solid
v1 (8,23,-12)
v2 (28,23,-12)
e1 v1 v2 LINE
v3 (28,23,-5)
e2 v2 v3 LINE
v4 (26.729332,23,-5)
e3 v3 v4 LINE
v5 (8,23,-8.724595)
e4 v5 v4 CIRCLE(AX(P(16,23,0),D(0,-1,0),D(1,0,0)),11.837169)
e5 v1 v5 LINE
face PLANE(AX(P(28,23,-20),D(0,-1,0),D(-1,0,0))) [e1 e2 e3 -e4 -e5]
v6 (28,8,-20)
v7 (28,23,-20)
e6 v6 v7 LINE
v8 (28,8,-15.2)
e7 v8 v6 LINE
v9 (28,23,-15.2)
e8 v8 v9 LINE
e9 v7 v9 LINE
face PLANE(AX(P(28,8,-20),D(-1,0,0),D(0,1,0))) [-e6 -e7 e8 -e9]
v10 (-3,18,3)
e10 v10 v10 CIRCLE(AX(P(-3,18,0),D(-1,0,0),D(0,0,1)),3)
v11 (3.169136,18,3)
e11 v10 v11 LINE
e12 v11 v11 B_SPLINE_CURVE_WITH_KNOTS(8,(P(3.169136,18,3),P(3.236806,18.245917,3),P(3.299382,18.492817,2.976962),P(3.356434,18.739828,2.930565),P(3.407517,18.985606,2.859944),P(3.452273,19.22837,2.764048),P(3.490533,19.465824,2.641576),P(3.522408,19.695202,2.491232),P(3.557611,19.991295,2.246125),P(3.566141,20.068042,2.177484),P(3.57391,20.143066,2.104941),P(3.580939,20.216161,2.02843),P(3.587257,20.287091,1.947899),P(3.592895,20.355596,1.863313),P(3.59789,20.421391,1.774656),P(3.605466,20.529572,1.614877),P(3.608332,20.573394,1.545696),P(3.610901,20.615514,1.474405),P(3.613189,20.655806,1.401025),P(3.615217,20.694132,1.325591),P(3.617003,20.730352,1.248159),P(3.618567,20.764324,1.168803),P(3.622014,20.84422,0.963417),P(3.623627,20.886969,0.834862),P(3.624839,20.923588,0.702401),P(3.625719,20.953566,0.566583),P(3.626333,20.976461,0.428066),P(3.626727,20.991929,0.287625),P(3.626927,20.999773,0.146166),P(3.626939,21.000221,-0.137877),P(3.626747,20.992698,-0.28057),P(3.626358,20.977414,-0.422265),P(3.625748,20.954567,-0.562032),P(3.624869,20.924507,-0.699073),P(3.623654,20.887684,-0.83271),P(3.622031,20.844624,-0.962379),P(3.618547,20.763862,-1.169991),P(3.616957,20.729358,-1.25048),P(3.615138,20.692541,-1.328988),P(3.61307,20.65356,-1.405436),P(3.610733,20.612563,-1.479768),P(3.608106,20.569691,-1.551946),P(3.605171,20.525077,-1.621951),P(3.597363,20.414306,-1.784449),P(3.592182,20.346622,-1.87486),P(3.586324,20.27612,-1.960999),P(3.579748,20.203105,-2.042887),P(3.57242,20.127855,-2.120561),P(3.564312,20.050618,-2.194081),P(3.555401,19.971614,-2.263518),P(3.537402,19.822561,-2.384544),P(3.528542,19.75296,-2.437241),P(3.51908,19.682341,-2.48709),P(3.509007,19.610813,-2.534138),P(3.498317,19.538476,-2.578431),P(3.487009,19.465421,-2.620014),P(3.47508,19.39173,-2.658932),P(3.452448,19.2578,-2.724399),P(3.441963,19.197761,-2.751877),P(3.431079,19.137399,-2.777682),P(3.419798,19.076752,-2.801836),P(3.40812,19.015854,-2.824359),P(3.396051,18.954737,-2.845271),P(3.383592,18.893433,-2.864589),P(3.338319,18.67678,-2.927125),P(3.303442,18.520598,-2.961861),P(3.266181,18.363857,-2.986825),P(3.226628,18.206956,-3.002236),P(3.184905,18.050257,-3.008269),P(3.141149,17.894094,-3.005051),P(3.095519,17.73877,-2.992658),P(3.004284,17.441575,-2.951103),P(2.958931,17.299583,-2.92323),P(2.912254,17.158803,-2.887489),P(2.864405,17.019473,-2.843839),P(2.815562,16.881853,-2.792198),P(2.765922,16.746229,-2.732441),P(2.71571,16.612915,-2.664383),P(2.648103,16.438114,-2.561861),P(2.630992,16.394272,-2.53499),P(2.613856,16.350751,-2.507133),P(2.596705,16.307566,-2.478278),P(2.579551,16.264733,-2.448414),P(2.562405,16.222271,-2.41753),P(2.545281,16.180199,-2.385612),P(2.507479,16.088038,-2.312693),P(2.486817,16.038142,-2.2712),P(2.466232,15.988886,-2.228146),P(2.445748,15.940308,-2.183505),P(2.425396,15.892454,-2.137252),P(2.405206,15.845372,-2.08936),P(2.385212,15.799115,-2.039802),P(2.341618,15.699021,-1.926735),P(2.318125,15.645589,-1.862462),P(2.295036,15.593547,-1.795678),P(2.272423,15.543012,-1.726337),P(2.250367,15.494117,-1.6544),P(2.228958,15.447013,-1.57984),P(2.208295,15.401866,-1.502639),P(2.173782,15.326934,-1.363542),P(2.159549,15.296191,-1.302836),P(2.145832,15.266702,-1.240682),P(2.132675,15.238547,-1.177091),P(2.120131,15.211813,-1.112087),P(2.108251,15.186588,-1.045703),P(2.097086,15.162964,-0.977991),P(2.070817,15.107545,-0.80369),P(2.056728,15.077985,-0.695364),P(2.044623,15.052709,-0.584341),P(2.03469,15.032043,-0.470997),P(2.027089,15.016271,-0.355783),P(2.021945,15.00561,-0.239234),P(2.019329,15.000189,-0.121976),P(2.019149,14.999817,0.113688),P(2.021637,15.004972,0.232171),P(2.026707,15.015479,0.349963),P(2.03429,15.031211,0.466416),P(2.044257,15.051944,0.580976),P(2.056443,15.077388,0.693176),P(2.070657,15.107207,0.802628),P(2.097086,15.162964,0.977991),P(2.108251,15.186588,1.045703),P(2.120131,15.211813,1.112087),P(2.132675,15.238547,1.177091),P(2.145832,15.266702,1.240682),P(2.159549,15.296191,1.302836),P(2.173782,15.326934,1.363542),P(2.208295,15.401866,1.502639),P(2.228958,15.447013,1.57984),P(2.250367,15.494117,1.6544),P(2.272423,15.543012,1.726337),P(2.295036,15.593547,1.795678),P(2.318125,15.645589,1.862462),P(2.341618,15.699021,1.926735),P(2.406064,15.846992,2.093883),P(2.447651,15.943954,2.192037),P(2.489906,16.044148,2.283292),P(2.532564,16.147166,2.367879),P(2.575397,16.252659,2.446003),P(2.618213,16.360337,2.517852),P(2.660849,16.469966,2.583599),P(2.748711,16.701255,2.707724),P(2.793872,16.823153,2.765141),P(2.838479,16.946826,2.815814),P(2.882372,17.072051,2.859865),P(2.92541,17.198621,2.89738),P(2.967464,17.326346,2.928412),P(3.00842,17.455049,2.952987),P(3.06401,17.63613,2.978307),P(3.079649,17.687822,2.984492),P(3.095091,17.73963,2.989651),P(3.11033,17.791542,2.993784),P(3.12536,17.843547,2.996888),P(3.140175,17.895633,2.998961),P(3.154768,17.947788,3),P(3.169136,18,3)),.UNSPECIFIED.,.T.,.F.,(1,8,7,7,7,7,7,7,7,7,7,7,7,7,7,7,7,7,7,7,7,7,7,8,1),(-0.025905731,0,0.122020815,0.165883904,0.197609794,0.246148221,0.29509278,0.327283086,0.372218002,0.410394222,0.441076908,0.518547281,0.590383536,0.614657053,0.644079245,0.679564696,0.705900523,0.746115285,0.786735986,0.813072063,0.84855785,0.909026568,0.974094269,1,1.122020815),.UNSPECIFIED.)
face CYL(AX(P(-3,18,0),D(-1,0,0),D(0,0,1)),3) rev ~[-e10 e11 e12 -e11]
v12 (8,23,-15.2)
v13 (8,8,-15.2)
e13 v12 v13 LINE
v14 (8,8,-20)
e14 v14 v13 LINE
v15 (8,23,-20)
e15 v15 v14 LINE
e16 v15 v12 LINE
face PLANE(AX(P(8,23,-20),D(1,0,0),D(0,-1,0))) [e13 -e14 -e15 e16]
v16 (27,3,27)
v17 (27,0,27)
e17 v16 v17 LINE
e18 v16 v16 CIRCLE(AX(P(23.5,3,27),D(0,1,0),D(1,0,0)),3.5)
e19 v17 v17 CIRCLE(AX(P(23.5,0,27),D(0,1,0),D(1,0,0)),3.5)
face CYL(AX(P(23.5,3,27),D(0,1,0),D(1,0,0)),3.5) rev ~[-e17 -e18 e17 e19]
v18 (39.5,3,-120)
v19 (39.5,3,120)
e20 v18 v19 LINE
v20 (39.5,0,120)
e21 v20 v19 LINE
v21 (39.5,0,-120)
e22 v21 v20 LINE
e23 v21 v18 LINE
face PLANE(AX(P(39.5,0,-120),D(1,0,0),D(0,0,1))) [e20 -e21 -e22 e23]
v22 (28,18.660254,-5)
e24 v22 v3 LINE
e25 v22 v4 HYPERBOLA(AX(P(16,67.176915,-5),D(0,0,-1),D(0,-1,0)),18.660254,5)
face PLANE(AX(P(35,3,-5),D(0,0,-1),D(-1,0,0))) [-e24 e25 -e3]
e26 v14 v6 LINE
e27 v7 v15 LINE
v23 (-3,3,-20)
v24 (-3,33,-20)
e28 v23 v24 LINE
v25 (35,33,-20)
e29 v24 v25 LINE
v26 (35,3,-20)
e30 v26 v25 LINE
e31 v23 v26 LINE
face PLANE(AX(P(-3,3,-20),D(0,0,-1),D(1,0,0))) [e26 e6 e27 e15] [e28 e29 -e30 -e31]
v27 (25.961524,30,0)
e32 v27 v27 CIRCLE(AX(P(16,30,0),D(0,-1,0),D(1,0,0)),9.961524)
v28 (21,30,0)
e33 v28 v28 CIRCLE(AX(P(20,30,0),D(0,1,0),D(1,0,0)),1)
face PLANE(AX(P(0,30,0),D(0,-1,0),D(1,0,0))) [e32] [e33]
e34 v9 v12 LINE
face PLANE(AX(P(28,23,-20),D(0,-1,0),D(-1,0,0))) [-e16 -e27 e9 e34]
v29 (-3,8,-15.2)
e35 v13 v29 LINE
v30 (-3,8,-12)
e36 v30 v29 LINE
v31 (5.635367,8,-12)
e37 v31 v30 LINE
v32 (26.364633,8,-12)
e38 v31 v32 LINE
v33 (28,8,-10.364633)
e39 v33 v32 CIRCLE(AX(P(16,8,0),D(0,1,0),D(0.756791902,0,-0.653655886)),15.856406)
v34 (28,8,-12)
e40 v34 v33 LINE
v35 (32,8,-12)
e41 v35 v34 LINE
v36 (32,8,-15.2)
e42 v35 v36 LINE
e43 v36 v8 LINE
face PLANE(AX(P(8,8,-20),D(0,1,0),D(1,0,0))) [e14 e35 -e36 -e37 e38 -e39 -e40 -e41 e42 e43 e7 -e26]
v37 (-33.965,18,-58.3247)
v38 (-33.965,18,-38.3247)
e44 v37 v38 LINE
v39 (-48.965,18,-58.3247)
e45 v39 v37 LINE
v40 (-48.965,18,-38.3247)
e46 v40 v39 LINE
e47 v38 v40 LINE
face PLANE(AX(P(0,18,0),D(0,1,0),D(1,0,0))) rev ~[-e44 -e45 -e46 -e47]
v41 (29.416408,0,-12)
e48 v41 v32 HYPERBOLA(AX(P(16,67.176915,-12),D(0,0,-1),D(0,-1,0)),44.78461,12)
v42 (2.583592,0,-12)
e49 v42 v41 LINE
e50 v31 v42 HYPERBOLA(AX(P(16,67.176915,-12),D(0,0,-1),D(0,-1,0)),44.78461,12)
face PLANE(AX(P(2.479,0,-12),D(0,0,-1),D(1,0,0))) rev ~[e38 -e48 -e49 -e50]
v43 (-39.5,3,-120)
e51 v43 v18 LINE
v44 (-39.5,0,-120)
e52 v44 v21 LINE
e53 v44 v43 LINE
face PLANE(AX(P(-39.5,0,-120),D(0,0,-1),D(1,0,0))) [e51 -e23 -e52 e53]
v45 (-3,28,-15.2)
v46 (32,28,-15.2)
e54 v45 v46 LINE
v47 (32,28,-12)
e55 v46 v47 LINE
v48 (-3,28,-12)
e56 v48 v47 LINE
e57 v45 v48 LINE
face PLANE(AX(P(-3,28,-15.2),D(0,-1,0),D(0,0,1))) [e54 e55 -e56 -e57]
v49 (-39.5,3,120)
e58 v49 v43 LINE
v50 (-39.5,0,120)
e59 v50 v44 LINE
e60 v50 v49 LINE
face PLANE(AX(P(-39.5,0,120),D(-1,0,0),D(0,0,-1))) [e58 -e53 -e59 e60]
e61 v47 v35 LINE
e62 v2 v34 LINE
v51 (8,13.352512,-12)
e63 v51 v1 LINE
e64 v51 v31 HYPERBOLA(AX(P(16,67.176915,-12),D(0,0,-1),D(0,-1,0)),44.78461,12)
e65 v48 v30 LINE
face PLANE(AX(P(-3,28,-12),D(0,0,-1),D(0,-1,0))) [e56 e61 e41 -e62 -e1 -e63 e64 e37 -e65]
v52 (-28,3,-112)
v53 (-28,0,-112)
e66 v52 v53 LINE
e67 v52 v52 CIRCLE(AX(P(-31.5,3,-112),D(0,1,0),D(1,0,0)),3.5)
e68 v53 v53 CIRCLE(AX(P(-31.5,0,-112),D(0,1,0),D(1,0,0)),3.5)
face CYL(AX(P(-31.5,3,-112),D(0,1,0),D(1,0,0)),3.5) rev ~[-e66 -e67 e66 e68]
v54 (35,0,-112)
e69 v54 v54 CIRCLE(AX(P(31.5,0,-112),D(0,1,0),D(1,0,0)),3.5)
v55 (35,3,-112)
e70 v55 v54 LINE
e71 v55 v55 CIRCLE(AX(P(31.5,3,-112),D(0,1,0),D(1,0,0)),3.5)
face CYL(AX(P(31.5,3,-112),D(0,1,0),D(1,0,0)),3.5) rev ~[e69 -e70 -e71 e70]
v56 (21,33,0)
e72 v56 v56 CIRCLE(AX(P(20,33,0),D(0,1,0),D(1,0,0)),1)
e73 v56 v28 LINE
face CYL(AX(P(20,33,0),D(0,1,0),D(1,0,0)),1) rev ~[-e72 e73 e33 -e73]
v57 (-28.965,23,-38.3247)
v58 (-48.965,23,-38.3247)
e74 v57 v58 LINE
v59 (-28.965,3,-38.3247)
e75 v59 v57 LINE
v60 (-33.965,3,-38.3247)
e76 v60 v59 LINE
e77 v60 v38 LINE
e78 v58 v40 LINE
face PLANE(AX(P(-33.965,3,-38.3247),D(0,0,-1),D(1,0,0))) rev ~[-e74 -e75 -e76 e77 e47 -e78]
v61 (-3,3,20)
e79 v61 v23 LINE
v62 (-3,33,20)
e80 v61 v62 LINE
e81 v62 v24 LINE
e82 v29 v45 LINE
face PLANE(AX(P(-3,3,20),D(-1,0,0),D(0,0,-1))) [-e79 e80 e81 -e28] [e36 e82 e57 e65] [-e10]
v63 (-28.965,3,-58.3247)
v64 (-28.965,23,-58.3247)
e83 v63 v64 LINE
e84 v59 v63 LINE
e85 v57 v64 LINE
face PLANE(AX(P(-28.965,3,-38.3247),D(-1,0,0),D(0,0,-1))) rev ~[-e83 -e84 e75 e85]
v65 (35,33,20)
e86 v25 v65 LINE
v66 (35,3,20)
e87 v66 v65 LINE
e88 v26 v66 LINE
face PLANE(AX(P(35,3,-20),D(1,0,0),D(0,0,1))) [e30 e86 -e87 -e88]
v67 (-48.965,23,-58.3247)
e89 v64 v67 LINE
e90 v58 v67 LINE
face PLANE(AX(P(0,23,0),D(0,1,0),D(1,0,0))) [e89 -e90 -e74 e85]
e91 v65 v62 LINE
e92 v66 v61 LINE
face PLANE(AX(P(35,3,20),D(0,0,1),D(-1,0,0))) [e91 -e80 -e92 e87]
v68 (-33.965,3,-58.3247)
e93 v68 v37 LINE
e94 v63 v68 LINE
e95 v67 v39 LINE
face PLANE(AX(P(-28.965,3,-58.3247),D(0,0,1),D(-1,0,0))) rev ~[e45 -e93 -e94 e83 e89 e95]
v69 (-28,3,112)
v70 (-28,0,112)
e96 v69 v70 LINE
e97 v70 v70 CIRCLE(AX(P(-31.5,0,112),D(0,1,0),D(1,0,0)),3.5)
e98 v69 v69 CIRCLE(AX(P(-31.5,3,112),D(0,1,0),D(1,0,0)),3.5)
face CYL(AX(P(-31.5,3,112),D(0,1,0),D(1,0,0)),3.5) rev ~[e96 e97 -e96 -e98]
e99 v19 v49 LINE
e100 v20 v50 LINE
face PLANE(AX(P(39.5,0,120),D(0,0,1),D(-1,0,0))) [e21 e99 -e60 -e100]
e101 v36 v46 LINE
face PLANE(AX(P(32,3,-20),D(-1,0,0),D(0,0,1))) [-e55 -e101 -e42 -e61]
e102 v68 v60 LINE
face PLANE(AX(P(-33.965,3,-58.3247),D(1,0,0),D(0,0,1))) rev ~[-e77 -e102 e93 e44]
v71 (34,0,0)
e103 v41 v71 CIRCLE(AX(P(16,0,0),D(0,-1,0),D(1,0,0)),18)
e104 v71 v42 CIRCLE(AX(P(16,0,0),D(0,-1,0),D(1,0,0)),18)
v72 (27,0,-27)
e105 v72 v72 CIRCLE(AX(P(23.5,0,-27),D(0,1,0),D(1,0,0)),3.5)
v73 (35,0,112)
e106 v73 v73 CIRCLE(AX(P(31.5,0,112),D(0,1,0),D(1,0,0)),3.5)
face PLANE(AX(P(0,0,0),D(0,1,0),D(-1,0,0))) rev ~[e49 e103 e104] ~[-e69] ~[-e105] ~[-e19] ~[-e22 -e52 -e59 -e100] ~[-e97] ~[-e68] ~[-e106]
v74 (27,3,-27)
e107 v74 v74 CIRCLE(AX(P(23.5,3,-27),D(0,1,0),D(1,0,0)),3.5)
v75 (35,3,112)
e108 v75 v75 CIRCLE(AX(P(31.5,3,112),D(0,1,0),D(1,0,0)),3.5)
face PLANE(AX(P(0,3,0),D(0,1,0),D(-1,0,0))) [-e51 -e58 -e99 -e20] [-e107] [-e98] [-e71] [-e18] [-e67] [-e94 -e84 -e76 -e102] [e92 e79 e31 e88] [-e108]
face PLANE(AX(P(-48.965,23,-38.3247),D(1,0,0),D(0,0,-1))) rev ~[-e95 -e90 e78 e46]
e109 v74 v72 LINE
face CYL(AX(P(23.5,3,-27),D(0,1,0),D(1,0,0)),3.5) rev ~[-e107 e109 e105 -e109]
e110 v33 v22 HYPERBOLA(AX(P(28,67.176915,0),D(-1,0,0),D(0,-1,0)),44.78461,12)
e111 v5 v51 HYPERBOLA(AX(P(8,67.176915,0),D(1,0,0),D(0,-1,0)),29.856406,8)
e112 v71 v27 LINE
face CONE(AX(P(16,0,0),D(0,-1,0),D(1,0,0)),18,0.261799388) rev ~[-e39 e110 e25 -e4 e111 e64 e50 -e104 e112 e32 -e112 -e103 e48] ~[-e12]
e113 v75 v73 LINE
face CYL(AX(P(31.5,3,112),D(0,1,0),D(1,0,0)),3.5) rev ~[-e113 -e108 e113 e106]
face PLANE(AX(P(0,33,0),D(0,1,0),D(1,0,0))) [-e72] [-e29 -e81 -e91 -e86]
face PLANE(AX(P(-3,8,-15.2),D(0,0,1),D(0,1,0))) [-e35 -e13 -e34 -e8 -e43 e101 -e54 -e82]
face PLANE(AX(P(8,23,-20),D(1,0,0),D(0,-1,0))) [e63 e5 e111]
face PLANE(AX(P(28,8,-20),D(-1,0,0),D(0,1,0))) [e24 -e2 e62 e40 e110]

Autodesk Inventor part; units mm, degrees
ref_plane "YZ Plane" through (0, 0, 0) normal (1, 0, 0) x (0, 1, 0)
ref_plane "XZ Plane" through (0, 0, 0) normal (0, 1, 0) x (-1, 0, 0)
ref_plane "XY Plane" through (0, 0, 0) normal (0, 0, 1) x (1, 0, 0)
sketch "Sketch44" plane through (0, 0, 0) normal (0, 1, 0) x (-1, 0, 0)
  line L0 (-39.5, 120) -> (39.5, 120)
  line L1 (39.5, 120) -> (39.5, -120)
  line L2 (39.5, -120) -> (-39.5, -120)
  line L3 (-39.5, -120) -> (-39.5, 120)
  line L4 (-39.5, 120) -> (39.5, -120) construction
  line L5 (39.5, 120) -> (-39.5, -120) construction
  point P0 (0, 0)
  dimension "d138" = 79
  dimension "d139" = 240
extrude "Extrusion33" add sketch "Sketch44" along normal blind 3
sketch "Sketch45" plane through (0, 3, 0) normal (0, 1, 0) x (1, 0, 0)
  line L0 (35, -20) -> (-3, -20)
  line L1 (-3, -20) -> (-3, 20)
  line L2 (-3, 20) -> (35, 20)
  line L3 (35, 20) -> (35, -20)
  point P0 (0, 0)
  dimension "d142" = 38
  dimension "d143" = 40
extrude "Extrusion34" add sketch "Sketch45" along normal blind 30
sketch "Sketch47" plane through (0, 0, 0) normal (0, -1, 0) x (1, 0, 0)
  circle A0 centre (16, 0) radius 18
  point P0 (0, 0)
  dimension "d146" = 36
extrude "Extrusion35" cut sketch "Sketch47" against normal blind 30 draft -15
sketch "Sketch58" plane through (35, 3, -20) normal (0, 0, -1) x (-1, 0, 0)
  line L0 (7, 20) -> (27, 20)
  line L1 (27, 20) -> (27, 5)
  line L2 (27, 5) -> (7, 5)
  line L3 (7, 5) -> (7, 20)
  point P0 (35, -3)
  dimension "d156" = 20
  dimension "d157" = 15
extrude "Extrusion38" cut sketch "Sketch58" against normal blind 15
sketch "Sketch59" plane through (-3, 3, -20) normal (-1, 0, 0) x (0, 0, 1)
  line L0 (4.8, 25) -> (8, 25)
  line L1 (8, 25) -> (8, 5)
  line L2 (8, 5) -> (4.8, 5)
  line L3 (4.8, 5) -> (4.8, 25)
  point P0 (20, -3)
  dimension "d160" = 3.2
  dimension "d161" = 20
extrude "Extrusion39" cut sketch "Sketch59" against normal blind 35
sketch "Sketch60" plane through (0, 3, 0) normal (0, 1, 0) x (1, 0, 0)
  line L0 (-33.965, 38.3247) -> (-28.965, 38.3247)
  line L1 (-28.965, 38.3247) -> (-28.965, 58.3247)
  line L2 (-28.965, 58.3247) -> (-33.965, 58.3247)
  line L3 (-33.965, 58.3247) -> (-33.965, 38.3247)
  point P0 (0, 0)
  dimension "d164" = 5
  dimension "d165" = 20
extrude "Extrusion40" add sketch "Sketch60" along normal blind 20
sketch "Sketch61" plane through (0, 23, 0) normal (0, 1, 0) x (1, 0, 0)
  line L0 (-28.965, 38.3247) -> (-28.965, 58.3247) projected
  line L1 (-28.965, 38.3247) -> (-48.965, 38.3247)
  line L2 (-48.965, 38.3247) -> (-48.965, 58.3247)
  line L3 (-48.965, 58.3247) -> (-28.965, 58.3247)
  line L4 (-28.965, 58.3247) -> (-28.965, 38.3247)
  point P0 (0, 0)
  dimension "d168" = 20
  dimension "d169" = 20
extrude "Extrusion41" add sketch "Sketch61" against normal blind 5
sketch "Sketch64" plane through (0, 33, 0) normal (0, 1, 0) x (1, 0, 0)
  circle A0 centre (20, 0) radius 1
  point P0 (0, 0)
  dimension "d173" = 2
extrude "Extrusion42" cut sketch "Sketch64" against normal through all
sketch "Sketch65" plane through (-3, 3, -20) normal (-1, 0, 0) x (0, 0, 1)
  circle A0 centre (20, 15) radius 3
  point P0 (20, -3)
  dimension "d176" = 6
extrude "Extrusion43" cut sketch "Sketch65" against normal blind 10
sketch "Sketch68" plane through (0, 3, 0) normal (0, 1, 0) x (1, 0, 0)
  circle A0 centre (-31.5, -112) radius 3.5
  circle A1 centre (31.5, -112) radius 3.5
  circle A2 centre (-31.5, 112) radius 3.5
  circle A3 centre (31.5, 112) radius 3.5
  point P0 (0, 0)
  dimension "d192" = 7
  dimension "d193" = 7
  dimension "d194" = 7
  dimension "d195" = 7
extrude "Extrusion46" cut sketch "Sketch68" against normal through all
sketch "Sketch69" plane through (0, 3, 0) normal (0, 1, 0) x (1, 0, 0)
  circle A0 centre (23.5, -27) radius 3.5
  circle A1 centre (23.5, 27) radius 3.5
  point P0 (0, 0)
  dimension "d198" = 7
  dimension "d199" = 7
extrude "Extrusion47" cut sketch "Sketch69" against normal through all
sketch "Sketch70" plane through (0, 0, 0) normal (0, -1, 0) x (1, 0, 0)
  line L0 (-3, -12) -> (32, -12) projected
  line L1 (2.479, -12) -> (29.6644, -12)
  line L2 (29.6644, -12) -> (29.6644, -18.105)
  line L3 (29.6644, -18.105) -> (2.479, -18.105)
  line L4 (2.479, -18.105) -> (2.479, -12)
  point P0 (0, 0)
extrude "Extrusion48" add sketch "Sketch70" against normal blind 8
equation "\"d193\" = d192"
equation "\"d194\" = d192"
equation "\"d195\" = d192"
equation "\"d198\" = d192"
equation "\"d199\" = d192"
properties part number "liquid port_v07"
